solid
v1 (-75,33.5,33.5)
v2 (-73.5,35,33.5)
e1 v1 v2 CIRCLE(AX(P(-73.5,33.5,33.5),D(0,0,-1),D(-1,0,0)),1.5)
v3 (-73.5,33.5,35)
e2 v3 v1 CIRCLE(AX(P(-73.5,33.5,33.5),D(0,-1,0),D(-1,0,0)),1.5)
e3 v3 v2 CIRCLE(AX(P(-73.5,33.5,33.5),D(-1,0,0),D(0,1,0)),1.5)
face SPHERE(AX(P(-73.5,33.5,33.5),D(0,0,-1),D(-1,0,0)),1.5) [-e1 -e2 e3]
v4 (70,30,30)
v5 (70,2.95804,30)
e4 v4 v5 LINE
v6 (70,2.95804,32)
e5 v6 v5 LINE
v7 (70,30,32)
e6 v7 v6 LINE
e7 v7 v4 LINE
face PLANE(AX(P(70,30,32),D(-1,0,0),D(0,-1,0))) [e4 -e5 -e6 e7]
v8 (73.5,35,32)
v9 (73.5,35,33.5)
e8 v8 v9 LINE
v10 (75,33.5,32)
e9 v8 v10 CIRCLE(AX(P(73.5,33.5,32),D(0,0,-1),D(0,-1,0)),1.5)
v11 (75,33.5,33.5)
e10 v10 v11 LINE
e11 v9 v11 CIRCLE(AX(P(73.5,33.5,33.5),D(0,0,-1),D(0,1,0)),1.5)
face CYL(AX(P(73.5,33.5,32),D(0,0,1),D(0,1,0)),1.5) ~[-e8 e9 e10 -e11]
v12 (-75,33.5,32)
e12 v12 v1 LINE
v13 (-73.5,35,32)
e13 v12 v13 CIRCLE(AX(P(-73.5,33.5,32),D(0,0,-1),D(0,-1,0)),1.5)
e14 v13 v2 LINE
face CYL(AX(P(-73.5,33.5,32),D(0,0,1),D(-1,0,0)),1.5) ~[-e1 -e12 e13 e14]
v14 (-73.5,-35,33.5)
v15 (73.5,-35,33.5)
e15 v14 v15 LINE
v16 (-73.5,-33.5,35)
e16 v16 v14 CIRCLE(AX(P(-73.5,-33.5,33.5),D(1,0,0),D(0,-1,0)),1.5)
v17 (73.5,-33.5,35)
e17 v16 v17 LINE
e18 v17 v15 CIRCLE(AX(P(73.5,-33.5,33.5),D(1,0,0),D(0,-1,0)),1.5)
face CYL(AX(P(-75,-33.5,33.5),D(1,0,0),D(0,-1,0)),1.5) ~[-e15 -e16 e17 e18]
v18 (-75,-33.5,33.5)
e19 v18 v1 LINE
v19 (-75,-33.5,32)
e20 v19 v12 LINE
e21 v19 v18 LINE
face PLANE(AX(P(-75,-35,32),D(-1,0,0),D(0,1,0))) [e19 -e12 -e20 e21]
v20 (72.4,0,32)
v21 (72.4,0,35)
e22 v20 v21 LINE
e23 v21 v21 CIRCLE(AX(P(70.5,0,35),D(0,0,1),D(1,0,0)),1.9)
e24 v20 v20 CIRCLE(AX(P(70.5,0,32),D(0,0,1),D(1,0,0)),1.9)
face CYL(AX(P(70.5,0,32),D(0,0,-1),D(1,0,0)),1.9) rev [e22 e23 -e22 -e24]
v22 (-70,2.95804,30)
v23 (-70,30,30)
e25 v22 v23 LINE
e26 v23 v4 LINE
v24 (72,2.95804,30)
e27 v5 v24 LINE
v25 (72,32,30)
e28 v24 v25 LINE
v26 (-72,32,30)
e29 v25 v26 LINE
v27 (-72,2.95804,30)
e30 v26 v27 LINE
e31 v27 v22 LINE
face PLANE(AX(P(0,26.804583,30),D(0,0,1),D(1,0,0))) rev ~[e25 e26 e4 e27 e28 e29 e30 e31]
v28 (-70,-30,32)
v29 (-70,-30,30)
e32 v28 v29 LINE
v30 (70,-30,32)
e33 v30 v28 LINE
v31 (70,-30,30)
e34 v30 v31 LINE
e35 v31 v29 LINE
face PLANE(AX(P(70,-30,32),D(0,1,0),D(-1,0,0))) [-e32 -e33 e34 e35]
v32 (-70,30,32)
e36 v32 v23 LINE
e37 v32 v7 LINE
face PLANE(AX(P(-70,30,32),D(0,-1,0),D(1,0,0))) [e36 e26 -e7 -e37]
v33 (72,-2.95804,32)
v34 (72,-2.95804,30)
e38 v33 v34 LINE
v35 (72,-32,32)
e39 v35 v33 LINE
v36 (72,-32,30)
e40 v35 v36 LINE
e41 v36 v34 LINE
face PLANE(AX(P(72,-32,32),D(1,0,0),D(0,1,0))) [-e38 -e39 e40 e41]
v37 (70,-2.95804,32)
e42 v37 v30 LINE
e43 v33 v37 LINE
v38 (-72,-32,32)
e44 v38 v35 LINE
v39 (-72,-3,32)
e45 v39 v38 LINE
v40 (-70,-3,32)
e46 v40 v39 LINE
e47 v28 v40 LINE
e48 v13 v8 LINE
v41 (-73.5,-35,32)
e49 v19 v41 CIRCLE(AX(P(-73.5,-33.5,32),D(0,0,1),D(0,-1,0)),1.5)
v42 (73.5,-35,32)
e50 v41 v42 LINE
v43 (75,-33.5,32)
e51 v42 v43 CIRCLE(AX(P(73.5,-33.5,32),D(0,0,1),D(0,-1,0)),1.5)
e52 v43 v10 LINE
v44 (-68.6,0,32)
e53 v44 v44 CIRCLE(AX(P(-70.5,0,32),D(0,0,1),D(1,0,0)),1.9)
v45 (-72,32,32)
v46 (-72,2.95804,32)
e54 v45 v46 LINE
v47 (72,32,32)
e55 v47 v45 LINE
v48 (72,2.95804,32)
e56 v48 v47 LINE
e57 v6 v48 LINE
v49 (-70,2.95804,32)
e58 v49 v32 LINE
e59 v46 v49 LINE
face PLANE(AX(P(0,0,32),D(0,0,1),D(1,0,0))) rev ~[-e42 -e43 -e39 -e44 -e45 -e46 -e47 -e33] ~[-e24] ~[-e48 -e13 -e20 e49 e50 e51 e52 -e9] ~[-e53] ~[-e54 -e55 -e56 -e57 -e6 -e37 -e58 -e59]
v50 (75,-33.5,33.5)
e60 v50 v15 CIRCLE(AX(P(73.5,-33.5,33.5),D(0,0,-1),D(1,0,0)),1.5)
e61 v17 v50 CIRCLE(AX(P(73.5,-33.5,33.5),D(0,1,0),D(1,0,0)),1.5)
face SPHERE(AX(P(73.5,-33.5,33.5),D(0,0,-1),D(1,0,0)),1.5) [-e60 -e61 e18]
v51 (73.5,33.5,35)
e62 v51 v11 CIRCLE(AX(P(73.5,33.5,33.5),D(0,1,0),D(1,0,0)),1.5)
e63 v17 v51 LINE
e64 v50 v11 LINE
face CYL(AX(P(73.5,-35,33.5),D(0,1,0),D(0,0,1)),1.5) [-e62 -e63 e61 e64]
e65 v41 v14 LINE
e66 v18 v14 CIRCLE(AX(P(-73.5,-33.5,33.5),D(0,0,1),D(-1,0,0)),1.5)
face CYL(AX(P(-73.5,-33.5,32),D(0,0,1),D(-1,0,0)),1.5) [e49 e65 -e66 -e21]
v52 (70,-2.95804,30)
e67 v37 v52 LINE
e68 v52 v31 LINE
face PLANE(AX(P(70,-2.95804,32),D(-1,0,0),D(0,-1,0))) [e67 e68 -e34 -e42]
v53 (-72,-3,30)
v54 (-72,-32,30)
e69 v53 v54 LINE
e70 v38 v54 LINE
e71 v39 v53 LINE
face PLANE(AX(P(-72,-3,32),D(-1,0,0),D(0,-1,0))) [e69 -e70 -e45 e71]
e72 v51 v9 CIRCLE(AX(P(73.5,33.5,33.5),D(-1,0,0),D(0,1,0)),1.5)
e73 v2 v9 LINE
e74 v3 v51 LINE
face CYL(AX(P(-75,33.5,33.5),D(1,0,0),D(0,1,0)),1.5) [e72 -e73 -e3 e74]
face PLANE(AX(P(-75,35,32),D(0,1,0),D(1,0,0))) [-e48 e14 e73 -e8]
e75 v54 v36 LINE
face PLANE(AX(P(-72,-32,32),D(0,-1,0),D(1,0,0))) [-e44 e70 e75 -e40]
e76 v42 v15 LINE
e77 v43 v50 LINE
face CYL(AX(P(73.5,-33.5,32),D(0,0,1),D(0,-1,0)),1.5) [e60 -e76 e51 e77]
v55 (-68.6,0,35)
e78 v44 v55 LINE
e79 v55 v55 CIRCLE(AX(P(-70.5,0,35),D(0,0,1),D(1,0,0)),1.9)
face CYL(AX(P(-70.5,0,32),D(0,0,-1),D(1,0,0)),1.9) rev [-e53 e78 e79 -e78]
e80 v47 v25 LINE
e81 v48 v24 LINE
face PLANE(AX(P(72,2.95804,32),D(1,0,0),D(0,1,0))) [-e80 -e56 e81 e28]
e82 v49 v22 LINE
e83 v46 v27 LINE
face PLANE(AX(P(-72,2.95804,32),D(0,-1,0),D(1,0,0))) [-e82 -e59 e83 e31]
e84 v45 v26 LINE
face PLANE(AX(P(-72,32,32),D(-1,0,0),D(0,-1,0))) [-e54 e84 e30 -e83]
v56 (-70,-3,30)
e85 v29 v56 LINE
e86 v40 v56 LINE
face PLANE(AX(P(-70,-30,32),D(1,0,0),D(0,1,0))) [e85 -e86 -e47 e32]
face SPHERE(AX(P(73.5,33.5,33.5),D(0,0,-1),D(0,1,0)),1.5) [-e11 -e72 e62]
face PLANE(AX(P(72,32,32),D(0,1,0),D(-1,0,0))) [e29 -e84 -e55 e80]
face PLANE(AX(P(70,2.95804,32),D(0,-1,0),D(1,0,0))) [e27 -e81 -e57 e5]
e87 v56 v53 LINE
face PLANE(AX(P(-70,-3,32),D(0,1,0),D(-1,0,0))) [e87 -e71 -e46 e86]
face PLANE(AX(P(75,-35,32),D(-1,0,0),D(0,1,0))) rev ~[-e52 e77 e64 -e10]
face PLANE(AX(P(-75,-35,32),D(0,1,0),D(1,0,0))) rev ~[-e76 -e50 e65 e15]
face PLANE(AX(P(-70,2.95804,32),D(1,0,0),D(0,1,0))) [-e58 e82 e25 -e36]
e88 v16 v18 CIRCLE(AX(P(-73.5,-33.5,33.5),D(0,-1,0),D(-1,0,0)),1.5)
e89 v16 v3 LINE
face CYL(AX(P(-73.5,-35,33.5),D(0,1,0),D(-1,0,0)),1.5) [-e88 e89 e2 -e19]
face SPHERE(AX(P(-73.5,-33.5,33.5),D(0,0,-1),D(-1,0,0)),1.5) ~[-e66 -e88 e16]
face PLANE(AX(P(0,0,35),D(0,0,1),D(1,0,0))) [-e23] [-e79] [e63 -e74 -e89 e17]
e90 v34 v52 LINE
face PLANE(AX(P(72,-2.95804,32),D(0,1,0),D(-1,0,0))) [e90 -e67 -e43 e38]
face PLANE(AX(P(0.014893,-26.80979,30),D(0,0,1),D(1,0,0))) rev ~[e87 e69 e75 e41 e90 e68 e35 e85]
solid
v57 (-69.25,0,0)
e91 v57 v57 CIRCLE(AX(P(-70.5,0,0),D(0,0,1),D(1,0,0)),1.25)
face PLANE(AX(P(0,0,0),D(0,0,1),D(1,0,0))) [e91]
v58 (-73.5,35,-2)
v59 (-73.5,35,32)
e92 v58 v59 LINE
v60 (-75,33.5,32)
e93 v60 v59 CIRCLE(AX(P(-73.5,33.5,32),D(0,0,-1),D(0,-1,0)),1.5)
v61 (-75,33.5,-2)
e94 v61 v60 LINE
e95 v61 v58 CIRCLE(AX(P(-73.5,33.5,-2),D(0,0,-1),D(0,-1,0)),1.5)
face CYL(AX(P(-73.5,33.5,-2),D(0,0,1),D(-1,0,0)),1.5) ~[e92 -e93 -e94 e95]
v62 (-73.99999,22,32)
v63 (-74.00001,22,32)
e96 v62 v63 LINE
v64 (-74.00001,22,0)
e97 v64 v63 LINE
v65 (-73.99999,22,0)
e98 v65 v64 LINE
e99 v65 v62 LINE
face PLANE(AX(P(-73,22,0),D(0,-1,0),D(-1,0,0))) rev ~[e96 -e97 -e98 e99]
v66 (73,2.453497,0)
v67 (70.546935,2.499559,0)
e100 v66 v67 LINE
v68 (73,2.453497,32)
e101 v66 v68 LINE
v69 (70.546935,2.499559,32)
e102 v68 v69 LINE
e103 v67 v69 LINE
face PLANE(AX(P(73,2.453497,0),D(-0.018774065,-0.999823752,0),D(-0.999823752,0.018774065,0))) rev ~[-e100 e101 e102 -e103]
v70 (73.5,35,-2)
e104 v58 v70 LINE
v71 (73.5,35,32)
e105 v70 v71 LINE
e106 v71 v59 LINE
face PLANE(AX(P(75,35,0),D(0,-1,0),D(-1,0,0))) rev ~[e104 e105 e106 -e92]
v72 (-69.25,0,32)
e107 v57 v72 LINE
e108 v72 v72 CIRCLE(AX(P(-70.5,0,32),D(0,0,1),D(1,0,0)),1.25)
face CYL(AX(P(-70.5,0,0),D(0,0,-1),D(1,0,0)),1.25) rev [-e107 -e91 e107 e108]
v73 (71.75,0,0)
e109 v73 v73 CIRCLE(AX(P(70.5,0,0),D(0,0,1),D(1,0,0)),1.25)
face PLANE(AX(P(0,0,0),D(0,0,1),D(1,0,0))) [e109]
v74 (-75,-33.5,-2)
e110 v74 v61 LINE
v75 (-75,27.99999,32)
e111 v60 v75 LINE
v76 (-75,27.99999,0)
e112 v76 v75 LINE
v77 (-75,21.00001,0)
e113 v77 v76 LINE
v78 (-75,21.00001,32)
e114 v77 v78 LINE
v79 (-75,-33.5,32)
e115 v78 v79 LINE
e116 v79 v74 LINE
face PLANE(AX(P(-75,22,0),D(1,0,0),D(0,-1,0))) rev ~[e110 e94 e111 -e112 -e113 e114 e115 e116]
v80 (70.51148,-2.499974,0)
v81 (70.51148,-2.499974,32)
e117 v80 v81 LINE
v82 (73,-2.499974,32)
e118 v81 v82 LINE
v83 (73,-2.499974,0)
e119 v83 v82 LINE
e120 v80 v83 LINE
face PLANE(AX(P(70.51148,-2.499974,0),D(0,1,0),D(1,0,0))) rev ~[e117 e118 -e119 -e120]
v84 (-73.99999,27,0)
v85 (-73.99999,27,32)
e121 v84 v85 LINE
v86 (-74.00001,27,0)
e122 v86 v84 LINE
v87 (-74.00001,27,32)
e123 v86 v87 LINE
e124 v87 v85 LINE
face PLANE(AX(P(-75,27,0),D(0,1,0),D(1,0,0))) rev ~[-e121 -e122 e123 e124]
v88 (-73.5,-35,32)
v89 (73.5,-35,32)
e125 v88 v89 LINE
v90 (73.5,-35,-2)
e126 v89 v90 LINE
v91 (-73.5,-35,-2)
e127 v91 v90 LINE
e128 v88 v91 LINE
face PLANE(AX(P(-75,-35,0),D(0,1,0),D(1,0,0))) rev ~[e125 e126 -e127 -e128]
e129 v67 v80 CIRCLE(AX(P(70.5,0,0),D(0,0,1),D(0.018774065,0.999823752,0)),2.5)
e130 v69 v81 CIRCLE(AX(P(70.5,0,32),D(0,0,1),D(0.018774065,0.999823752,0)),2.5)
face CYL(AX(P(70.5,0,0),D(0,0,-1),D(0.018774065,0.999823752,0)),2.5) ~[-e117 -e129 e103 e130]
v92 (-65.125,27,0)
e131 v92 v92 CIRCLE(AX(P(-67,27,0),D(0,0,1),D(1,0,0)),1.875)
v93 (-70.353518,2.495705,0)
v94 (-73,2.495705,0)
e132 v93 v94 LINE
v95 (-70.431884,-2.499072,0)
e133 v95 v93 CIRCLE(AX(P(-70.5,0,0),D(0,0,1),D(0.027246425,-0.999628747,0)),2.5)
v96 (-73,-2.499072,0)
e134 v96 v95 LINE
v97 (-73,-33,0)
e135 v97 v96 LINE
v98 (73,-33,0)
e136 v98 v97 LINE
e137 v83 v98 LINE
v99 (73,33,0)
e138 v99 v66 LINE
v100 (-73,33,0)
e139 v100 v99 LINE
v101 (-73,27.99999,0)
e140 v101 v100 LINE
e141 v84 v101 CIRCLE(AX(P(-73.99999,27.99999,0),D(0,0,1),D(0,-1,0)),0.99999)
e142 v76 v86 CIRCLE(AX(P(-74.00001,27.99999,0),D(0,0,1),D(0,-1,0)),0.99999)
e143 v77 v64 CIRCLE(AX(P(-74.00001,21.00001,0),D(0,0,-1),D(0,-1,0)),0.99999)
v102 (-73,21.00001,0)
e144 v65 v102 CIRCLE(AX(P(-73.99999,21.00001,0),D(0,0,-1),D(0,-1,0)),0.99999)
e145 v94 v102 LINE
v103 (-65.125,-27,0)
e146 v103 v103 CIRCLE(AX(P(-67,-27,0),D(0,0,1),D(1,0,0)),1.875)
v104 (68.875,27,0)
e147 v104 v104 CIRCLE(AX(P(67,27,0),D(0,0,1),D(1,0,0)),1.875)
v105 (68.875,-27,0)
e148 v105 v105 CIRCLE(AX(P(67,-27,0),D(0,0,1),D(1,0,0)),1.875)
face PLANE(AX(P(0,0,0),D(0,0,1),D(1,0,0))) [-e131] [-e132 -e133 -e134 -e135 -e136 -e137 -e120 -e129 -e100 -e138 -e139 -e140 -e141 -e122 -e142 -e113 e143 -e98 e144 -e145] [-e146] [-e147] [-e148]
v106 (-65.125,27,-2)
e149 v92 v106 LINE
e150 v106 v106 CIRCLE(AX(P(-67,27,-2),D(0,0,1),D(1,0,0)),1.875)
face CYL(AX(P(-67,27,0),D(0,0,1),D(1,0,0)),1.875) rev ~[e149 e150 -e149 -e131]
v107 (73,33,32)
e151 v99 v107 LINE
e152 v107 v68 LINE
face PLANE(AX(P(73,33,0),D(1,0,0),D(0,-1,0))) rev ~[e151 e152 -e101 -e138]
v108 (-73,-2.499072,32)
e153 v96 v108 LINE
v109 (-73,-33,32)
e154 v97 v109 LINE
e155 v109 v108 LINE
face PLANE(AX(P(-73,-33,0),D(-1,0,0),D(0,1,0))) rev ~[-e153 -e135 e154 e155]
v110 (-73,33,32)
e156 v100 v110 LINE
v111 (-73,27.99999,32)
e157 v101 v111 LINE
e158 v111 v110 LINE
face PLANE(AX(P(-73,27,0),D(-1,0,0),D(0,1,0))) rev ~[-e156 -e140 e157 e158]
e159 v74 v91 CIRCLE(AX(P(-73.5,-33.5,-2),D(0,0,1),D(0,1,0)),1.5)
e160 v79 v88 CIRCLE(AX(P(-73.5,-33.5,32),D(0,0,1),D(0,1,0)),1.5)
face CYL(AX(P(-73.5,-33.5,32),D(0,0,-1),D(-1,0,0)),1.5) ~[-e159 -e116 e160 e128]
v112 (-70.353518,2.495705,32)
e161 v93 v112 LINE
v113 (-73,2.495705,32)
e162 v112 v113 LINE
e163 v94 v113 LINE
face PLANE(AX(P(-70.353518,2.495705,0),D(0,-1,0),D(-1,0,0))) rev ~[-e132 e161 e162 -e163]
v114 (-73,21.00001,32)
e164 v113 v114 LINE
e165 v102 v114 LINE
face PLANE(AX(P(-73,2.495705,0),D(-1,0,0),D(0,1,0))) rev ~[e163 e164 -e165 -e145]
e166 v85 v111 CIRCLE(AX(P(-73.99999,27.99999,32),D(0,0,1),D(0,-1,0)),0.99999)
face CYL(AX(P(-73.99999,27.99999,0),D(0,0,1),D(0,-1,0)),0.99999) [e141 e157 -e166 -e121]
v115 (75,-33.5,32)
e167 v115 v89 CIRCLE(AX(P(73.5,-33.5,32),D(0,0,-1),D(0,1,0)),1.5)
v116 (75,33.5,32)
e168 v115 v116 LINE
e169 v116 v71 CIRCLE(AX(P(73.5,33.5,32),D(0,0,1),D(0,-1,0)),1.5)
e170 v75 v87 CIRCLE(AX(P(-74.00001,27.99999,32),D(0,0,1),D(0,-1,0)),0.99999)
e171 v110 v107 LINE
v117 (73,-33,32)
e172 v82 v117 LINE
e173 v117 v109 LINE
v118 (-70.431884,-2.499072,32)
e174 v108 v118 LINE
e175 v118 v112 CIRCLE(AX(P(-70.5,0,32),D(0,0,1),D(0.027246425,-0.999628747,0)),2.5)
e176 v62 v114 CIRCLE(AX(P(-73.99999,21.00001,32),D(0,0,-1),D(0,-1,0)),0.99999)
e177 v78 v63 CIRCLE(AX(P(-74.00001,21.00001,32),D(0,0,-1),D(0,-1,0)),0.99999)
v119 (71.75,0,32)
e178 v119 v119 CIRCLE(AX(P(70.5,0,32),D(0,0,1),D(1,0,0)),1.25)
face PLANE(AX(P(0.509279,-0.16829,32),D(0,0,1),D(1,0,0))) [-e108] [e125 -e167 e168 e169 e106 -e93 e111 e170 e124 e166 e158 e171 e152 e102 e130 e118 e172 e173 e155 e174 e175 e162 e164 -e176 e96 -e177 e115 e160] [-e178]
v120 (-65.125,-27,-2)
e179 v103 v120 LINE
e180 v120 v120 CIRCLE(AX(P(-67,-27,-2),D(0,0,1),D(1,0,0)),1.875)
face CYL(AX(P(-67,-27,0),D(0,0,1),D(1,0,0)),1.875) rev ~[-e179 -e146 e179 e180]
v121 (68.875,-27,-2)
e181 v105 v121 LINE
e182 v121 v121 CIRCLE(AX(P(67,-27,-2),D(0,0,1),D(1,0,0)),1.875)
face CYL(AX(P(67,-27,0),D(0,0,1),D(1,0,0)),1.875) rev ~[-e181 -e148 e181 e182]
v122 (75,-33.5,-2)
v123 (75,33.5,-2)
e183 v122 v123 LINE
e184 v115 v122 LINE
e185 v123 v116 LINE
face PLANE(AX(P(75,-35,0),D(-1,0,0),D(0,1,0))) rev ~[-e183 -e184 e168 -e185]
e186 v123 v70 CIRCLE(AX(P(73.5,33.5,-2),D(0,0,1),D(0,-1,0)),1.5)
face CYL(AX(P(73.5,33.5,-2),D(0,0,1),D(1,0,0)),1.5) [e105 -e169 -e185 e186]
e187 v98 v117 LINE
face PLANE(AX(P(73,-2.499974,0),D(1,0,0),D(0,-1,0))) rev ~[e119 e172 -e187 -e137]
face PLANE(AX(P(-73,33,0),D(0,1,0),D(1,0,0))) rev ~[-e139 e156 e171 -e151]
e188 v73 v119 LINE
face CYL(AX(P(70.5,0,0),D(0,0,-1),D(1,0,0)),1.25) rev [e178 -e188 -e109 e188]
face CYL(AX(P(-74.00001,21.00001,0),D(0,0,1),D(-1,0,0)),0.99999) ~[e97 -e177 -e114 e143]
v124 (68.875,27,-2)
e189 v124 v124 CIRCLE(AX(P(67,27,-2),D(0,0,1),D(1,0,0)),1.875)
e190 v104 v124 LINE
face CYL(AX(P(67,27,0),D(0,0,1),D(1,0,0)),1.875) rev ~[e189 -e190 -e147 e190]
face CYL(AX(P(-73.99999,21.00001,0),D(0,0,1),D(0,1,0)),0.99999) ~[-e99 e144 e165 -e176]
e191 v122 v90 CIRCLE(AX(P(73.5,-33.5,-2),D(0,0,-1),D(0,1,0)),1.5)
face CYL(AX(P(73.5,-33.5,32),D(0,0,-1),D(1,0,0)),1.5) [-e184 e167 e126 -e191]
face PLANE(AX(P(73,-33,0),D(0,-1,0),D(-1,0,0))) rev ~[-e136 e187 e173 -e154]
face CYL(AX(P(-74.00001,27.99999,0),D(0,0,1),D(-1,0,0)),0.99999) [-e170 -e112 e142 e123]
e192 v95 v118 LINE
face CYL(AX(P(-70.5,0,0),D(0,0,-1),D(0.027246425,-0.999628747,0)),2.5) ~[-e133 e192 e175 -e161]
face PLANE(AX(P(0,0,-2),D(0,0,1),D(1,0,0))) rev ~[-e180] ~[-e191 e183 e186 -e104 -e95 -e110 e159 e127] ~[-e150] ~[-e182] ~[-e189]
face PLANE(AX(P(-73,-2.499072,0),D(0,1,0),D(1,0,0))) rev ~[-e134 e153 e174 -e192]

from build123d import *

# Parameters (mm, degrees)
F0_W     = 150
F0_H     = 70
F0_R     = 1.875
F1_DEPTH = 2
F2_R     = 1.25
F3_DEPTH = 32
F4_W     = 150
F4_H     = 70
F4_R     = 1.9
F5_DEPTH = 3
F7_DEPTH = 2
F8_R     = 1.5
F8_2_R   = 1.5
F9_R     = 0.99999


# Not quite as in the source:
# - a fillet or chamfer is up to 0.001 mm smaller than in the source, because OpenCascade refuses the exact size


with BuildPart() as f1:
    # F0 (on Top) → F1 (new body)
    with BuildSketch(Plane.XY):
        Rectangle(F0_W, F0_H)
        with Locations((-67, -27)):
            Circle(F0_R, mode=Mode.SUBTRACT)
        with Locations((67, -27)):
            Circle(F0_R, mode=Mode.SUBTRACT)
        with Locations((-67, 27)):
            Circle(F0_R, mode=Mode.SUBTRACT)
        with Locations((67, 27)):
            Circle(F0_R, mode=Mode.SUBTRACT)
    extrude(amount=-F1_DEPTH)

    # F2 (on Top) → F3 (join)
    with BuildSketch(Plane.XY):
        with BuildLine():
            Line((75, -35), (75, 35))
            Line((75, 35), (-75, 35))
            Line((-75, 35), (-75, 27))
            Line((-75, 27), (-73, 27))
            Line((-73, 27), (-73, 33))
            Line((-73, 33), (73, 33))
            Line((73, 33), (73, 2.4534972628))
            Line((73, 2.4534972628), (70.5469351619, 2.4995593793))
            ThreePointArc((70.5469351619, 2.4995593793), (68.0000628641, 0.0177289705), (70.5114796409, -2.4999736434))
            Line((70.5114796409, -2.4999736434), (73, -2.4999736434))
            Line((73, -2.4999736434), (73, -33))
            Line((73, -33), (-73, -33))
            Line((-73, -33), (-73, -2.4990718681))
            Line((-73, -2.4990718681), (-70.5681160628, -2.4990718681))
            Line((-70.5681160628, -2.4990718681), (-70.4318839372, -2.4990718681))
            ThreePointArc((-70.4318839372, -2.4990718681), (-68.0003076438, -0.0392189257), (-70.3535183815, 2.4957049376))
            Line((-70.3535183815, 2.4957049376), (-70.6464816185, 2.4957049376))
            Line((-70.6464816185, 2.4957049376), (-73, 2.4957049376))
            Line((-73, 2.4957049376), (-73, 22))
            Line((-73, 22), (-75, 22))
            Line((-75, 22), (-75, -35))
            Line((-75, -35), (75, -35))
        make_face()
        with Locations((-70.5, 0)):
            Circle(F2_R, mode=Mode.SUBTRACT)
        with Locations((70.5, 0)):
            Circle(F2_R, mode=Mode.SUBTRACT)
    extrude(amount=F3_DEPTH)

    # F8
    f8_edges = [f1.edges().sort_by_distance(p)[0] for p in [
        (-75, -35, 15),
        (75, -35, 15),
        (75, 35, 15),
        (-75, 35, 15),
    ]]
    fillet(f8_edges, radius=F8_R)

    # F9 (radius 1 in the source; OpenCascade refuses exactly that, so slightly less here)
    f9_edges = [f1.edges().sort_by_distance(p)[0] for p in [
        (-75, 22, 16),
        (-73, 22, 16),
        (-75, 27, 16),
        (-73, 27, 16),
    ]]
    fillet(f9_edges, radius=F9_R)


with BuildPart() as f5:
    # F4 (on face) → F5 (new body)
    with BuildSketch(Plane.XY.offset(32)):
        Rectangle(F4_W, F4_H)
        with Locations((-70.5, 0)):
            Circle(F4_R, mode=Mode.SUBTRACT)
        with Locations((70.5, 0)):
            Circle(F4_R, mode=Mode.SUBTRACT)
    extrude(amount=F5_DEPTH)

    # F6 (on face) → F7 (join)
    with BuildSketch(Plane.XY.offset(32)):
        Polygon((-72, -3), (-72, -32), (72, -32), (72, -2.9580398915), (70, -2.9580398915), (70, -30), (-70, -30), (-70, -3), align=None)
        Polygon((72, 32), (-72, 32), (-72, 2.9580398915), (-70, 2.9580398915), (-70, 30), (70, 30), (70, 2.9580398915), (72, 2.9580398915), align=None)
    extrude(amount=-F7_DEPTH)

    # F8#2
    f8_2_edges = [f5.edges().sort_by_distance(p)[0] for p in [
        (-75, -35, 33.5),
        (-75, 35, 33.5),
        (75, 35, 33.5),
        (75, -35, 33.5),
        (-75, 0, 35),
        (0, 35, 35),
        (75, 0, 35),
        (0, -35, 35),
    ]]
    fillet(f8_2_edges, radius=F8_2_R)


solid = Compound([f1.part, f5.part])
